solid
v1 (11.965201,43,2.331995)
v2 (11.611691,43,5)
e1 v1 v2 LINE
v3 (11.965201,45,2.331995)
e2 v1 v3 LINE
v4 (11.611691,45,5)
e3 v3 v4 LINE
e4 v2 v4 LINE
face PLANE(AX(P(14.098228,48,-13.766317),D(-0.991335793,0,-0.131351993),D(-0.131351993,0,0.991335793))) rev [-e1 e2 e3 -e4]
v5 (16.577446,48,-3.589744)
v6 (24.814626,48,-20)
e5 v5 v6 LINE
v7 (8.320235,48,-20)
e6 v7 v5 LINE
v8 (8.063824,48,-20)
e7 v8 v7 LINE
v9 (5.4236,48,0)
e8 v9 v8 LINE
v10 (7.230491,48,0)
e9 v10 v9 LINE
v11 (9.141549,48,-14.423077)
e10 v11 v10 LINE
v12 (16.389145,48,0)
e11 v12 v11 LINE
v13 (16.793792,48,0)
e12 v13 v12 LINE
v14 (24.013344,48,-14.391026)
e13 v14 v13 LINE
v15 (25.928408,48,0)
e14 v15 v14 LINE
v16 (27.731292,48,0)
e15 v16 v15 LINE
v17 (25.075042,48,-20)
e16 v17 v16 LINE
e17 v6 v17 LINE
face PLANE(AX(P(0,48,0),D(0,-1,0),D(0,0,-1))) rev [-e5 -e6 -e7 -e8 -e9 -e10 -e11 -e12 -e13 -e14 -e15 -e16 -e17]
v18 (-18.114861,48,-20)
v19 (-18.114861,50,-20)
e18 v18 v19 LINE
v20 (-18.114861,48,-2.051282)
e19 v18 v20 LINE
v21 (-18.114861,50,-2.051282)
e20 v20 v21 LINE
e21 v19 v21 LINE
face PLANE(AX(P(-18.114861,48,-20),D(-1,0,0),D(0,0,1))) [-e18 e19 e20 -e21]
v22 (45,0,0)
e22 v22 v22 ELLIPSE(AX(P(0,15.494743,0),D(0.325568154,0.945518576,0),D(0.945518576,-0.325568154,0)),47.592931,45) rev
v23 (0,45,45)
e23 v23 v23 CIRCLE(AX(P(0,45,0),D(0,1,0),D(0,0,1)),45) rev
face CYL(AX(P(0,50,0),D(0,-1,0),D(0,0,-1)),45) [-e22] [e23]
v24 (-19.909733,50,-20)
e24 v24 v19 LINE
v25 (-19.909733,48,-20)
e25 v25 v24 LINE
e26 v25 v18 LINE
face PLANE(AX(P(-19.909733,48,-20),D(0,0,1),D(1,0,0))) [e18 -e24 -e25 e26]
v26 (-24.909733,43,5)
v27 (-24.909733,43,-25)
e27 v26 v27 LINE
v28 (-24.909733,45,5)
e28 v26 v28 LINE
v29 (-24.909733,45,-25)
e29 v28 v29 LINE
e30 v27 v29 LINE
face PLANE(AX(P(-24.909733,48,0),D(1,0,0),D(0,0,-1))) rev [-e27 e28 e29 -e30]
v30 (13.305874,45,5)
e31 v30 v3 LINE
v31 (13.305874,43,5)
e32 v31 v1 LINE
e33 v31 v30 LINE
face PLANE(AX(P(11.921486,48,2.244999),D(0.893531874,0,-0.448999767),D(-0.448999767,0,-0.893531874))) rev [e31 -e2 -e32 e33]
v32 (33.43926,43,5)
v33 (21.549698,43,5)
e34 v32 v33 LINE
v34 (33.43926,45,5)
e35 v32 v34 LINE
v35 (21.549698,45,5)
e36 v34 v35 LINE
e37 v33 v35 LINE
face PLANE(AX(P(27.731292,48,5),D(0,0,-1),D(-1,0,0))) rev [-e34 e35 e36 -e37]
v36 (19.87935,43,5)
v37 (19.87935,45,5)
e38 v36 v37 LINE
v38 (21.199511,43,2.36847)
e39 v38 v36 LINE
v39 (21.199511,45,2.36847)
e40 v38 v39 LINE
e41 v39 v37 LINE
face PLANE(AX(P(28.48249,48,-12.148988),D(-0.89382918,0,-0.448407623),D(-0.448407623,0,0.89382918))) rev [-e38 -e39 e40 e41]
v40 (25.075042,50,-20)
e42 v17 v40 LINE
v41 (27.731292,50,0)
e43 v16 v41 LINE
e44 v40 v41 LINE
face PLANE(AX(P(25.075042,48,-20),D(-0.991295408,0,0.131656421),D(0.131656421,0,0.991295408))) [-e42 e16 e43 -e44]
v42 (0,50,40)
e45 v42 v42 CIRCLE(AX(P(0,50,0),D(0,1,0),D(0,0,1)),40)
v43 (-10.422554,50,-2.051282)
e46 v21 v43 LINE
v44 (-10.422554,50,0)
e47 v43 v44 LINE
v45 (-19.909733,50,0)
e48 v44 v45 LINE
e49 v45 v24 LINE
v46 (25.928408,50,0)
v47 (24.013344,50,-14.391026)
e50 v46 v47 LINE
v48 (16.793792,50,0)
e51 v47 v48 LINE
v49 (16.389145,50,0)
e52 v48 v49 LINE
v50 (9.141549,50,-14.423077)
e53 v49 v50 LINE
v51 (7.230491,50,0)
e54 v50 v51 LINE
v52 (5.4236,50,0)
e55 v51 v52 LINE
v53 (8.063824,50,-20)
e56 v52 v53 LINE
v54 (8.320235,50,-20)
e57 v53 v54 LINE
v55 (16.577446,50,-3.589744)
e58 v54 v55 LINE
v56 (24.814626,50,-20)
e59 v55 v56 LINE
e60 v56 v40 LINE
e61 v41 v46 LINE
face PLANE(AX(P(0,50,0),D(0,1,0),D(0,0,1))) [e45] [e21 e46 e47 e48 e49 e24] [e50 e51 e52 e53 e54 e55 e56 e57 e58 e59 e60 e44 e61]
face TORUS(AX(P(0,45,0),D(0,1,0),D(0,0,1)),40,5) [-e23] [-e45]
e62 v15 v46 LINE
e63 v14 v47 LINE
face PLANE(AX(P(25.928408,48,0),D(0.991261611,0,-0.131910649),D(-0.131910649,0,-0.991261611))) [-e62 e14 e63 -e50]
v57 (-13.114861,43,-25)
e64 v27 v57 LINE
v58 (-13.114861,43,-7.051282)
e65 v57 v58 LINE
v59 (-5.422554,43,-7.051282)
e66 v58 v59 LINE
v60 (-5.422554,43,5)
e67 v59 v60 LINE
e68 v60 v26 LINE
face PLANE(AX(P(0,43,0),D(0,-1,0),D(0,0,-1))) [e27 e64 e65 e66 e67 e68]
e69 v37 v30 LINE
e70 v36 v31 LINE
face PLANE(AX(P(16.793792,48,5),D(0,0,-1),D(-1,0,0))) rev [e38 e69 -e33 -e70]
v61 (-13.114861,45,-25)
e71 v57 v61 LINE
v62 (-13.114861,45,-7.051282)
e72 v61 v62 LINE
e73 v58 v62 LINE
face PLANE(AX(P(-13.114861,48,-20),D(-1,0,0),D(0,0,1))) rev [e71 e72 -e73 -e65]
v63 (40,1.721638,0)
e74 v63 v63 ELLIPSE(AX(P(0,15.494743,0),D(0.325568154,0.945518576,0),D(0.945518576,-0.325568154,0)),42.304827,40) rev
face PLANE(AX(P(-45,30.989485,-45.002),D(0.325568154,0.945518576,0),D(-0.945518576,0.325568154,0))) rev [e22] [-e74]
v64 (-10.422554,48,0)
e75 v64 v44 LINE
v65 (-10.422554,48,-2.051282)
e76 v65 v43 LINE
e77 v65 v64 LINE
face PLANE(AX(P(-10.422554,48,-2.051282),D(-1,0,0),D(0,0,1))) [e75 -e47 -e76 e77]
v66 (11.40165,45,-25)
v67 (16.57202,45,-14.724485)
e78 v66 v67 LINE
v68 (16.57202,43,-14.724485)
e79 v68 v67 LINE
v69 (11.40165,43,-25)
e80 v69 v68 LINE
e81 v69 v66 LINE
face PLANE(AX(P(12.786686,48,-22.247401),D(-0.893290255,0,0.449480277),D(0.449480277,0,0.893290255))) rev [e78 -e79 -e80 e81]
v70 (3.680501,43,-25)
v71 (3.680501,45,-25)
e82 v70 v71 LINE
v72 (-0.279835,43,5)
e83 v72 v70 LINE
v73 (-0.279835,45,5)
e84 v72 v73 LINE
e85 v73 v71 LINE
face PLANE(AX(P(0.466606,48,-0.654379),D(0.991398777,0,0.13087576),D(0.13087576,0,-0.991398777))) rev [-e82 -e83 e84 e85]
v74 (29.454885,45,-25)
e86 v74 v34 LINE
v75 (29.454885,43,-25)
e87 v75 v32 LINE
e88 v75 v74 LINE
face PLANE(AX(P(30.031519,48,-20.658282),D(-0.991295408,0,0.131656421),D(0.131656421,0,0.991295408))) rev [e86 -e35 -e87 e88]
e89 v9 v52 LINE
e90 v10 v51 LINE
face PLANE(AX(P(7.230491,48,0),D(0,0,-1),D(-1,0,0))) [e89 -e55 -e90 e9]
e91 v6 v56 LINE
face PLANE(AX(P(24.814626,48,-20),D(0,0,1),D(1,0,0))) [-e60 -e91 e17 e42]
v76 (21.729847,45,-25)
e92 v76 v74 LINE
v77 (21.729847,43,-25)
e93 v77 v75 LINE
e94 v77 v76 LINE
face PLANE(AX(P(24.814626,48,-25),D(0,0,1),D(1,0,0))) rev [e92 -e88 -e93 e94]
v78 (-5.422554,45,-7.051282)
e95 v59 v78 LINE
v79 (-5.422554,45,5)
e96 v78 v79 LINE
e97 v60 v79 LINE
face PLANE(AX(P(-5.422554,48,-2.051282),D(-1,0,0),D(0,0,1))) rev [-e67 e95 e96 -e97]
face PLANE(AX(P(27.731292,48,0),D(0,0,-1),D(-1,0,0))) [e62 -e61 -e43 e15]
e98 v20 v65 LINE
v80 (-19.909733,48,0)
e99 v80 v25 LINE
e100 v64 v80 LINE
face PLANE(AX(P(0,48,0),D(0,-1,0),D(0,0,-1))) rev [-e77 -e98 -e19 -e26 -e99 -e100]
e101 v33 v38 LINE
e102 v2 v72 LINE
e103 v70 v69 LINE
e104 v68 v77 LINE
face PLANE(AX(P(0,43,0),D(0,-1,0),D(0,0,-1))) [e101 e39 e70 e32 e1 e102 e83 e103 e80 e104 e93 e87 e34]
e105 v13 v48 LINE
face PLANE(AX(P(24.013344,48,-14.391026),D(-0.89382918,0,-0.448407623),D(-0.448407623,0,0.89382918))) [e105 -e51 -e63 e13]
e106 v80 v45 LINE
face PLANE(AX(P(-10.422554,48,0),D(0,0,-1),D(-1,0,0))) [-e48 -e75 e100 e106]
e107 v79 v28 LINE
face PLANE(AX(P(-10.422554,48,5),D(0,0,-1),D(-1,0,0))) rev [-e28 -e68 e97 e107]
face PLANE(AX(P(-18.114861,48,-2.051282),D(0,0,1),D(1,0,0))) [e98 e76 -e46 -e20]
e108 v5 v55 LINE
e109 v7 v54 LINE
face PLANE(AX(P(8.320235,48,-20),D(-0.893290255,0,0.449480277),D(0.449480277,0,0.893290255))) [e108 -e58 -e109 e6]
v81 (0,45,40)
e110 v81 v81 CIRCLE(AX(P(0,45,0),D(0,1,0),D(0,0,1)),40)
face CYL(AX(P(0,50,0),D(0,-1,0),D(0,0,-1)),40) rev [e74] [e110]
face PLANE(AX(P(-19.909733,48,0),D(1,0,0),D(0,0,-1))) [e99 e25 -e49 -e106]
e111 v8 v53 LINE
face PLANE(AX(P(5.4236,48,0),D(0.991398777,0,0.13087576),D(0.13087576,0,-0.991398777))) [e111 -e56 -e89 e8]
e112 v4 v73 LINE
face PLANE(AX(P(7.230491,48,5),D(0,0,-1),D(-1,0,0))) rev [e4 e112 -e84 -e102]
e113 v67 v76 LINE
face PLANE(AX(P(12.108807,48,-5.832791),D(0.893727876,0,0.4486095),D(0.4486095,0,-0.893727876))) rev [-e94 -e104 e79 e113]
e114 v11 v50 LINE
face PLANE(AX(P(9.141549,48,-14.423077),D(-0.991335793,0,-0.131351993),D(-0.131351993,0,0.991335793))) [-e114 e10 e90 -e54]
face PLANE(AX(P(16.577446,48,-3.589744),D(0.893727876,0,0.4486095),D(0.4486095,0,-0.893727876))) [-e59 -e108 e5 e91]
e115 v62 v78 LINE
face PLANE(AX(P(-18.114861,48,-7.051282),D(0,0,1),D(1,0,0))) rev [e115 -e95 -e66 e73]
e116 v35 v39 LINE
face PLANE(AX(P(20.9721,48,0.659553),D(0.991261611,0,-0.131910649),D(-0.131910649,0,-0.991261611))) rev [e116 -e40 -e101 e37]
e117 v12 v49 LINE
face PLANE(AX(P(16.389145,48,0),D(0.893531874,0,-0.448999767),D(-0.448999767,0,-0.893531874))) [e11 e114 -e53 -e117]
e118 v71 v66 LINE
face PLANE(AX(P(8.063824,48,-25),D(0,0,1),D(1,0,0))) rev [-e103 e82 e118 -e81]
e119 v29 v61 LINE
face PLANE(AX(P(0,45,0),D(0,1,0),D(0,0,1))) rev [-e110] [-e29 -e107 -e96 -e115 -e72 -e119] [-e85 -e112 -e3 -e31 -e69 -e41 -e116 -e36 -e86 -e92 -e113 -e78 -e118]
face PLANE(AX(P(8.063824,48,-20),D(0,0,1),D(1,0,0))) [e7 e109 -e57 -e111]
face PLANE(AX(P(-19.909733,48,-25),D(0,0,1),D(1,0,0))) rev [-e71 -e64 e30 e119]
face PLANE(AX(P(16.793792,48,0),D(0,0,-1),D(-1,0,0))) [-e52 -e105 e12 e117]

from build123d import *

# Parameters (mm, degrees)
SKETCH1_R                      = 45
BOSS_EXTRUDE1_DEPTH            = 50
CUT_EXTRUDE1_REACH             = 82.932
CUT_EXTRUDE1_DIRECTION_2_REACH = 82.932
FILLET1_R                      = 5
CUT_EXTRUDE2_DEPTH             = 2
SHELL1_START                   = 1.721637966
SHELL1_OUTLINE_R               = 40
SHELL1_DEPTH                   = 41.278362034
SHELL1_START_2                 = 43
SHELL1_2_OUTLINE_R             = 40
SHELL1_2_DEPTH                 = 2


with BuildPart() as part:
    # Sketch1 → Boss-Extrude1 (new body)
    with BuildSketch(Plane(origin=(0, 0, 0), x_dir=(1, 0, 0), z_dir=(0, 1, 0))):
        with Locations(Location((0, 0, 0), (0, 0, 270))):
            Circle(SKETCH1_R)
    extrude(amount=BOSS_EXTRUDE1_DEPTH)

    # Sketch2 → Cut-Extrude1 (cut, up to next)
    with BuildSketch(Plane.XY, mode=Mode.PRIVATE) as cut_extrude1_sk1:
        Polygon((45, 0), (-45, 0), (-45, 30.989485196), align=None)
    cut_extrude1_tool1 = extrude(cut_extrude1_sk1.sketch, amount=-CUT_EXTRUDE1_REACH, mode=Mode.PRIVATE) & part.part
    add(cut_extrude1_tool1.solids().sort_by_distance((-15, 10.329828, 0))[0], mode=Mode.SUBTRACT)

    # Sketch2 → Cut-Extrude1 direction 2 (cut, up to next)
    with BuildSketch(Plane.XY, mode=Mode.PRIVATE) as cut_extrude1_direction_2_sk1:
        Polygon((45, 0), (-45, 0), (-45, 30.989485196), align=None)
    cut_extrude1_direction_2_tool1 = extrude(cut_extrude1_direction_2_sk1.sketch, amount=CUT_EXTRUDE1_DIRECTION_2_REACH, mode=Mode.PRIVATE) & part.part
    add(cut_extrude1_direction_2_tool1.solids().sort_by_distance((-15, 10.329828, 0))[0], mode=Mode.SUBTRACT)

    # Fillet1
    fillet1_edges = [part.edges().sort_by_distance(p)[0] for p in [
        (0, 50, -45),
    ]]
    fillet(fillet1_edges, radius=FILLET1_R)

    # Sketch4 → Cut-Extrude2 (cut)
    with BuildSketch(Plane(origin=(0, 50, 0), x_dir=(1, 0, 0), z_dir=(0, 1, 0))):
        Polygon((-19.909733282, 20), (-18.114861487, 20), (-18.114861487, 2.051282051), (-10.422553795, 2.051282051), (-10.422553795, 0), (-19.909733282, 0), align=None)
        Polygon((5.423600051, 0), (8.06382441, 20), (8.320234666, 20), (16.577446205, 3.58974359), (24.814625692, 20), (25.075042359, 20), (27.731292359, 0), (25.928407743, 0), (24.013343641, 14.391025641), (16.793792359, 0), (16.389144923, 0), (9.141548769, 14.423076923), (7.230491077, 0), align=None)
    extrude(amount=-CUT_EXTRUDE2_DEPTH, mode=Mode.SUBTRACT)

    # Shell1: read off the stored shape, not the designer's step
    # Shell1 outline → Shell1 (cut)
    with BuildSketch(Plane(origin=(0, 0, 0), x_dir=(1, 0, 0), z_dir=(0, 1, 0)).offset(SHELL1_START)):
        Circle(SHELL1_OUTLINE_R)
    extrude(amount=SHELL1_DEPTH, mode=Mode.SUBTRACT)

    # Shell1 2 outline → Shell1 2 (cut)
    with BuildSketch(Plane(origin=(0, 0, 0), x_dir=(1, 0, 0), z_dir=(0, 1, 0)).offset(SHELL1_START_2)):
        Circle(SHELL1_2_OUTLINE_R)
        Polygon((-5.422553795, 7.051282051), (-5.422553795, -5), (-24.909733282, -5), (-24.909733282, 25), (-13.114861487, 25), (-13.114861487, 7.051282051), align=None, mode=Mode.SUBTRACT)
        Polygon((11.965201342, -2.331995426), (11.611690736, -5), (-0.279835267, -5), (3.680501271, 25), (11.401650362, 25), (16.572020474, 14.72448521), (21.729847234, 25), (29.454884993, 25), (33.439259993, -5), (21.549698117, -5), (21.1995112, -2.368469859), (19.879350477, -5), (13.30587364, -5), align=None, mode=Mode.SUBTRACT)
    extrude(amount=SHELL1_2_DEPTH, mode=Mode.SUBTRACT)


solid = part.part
